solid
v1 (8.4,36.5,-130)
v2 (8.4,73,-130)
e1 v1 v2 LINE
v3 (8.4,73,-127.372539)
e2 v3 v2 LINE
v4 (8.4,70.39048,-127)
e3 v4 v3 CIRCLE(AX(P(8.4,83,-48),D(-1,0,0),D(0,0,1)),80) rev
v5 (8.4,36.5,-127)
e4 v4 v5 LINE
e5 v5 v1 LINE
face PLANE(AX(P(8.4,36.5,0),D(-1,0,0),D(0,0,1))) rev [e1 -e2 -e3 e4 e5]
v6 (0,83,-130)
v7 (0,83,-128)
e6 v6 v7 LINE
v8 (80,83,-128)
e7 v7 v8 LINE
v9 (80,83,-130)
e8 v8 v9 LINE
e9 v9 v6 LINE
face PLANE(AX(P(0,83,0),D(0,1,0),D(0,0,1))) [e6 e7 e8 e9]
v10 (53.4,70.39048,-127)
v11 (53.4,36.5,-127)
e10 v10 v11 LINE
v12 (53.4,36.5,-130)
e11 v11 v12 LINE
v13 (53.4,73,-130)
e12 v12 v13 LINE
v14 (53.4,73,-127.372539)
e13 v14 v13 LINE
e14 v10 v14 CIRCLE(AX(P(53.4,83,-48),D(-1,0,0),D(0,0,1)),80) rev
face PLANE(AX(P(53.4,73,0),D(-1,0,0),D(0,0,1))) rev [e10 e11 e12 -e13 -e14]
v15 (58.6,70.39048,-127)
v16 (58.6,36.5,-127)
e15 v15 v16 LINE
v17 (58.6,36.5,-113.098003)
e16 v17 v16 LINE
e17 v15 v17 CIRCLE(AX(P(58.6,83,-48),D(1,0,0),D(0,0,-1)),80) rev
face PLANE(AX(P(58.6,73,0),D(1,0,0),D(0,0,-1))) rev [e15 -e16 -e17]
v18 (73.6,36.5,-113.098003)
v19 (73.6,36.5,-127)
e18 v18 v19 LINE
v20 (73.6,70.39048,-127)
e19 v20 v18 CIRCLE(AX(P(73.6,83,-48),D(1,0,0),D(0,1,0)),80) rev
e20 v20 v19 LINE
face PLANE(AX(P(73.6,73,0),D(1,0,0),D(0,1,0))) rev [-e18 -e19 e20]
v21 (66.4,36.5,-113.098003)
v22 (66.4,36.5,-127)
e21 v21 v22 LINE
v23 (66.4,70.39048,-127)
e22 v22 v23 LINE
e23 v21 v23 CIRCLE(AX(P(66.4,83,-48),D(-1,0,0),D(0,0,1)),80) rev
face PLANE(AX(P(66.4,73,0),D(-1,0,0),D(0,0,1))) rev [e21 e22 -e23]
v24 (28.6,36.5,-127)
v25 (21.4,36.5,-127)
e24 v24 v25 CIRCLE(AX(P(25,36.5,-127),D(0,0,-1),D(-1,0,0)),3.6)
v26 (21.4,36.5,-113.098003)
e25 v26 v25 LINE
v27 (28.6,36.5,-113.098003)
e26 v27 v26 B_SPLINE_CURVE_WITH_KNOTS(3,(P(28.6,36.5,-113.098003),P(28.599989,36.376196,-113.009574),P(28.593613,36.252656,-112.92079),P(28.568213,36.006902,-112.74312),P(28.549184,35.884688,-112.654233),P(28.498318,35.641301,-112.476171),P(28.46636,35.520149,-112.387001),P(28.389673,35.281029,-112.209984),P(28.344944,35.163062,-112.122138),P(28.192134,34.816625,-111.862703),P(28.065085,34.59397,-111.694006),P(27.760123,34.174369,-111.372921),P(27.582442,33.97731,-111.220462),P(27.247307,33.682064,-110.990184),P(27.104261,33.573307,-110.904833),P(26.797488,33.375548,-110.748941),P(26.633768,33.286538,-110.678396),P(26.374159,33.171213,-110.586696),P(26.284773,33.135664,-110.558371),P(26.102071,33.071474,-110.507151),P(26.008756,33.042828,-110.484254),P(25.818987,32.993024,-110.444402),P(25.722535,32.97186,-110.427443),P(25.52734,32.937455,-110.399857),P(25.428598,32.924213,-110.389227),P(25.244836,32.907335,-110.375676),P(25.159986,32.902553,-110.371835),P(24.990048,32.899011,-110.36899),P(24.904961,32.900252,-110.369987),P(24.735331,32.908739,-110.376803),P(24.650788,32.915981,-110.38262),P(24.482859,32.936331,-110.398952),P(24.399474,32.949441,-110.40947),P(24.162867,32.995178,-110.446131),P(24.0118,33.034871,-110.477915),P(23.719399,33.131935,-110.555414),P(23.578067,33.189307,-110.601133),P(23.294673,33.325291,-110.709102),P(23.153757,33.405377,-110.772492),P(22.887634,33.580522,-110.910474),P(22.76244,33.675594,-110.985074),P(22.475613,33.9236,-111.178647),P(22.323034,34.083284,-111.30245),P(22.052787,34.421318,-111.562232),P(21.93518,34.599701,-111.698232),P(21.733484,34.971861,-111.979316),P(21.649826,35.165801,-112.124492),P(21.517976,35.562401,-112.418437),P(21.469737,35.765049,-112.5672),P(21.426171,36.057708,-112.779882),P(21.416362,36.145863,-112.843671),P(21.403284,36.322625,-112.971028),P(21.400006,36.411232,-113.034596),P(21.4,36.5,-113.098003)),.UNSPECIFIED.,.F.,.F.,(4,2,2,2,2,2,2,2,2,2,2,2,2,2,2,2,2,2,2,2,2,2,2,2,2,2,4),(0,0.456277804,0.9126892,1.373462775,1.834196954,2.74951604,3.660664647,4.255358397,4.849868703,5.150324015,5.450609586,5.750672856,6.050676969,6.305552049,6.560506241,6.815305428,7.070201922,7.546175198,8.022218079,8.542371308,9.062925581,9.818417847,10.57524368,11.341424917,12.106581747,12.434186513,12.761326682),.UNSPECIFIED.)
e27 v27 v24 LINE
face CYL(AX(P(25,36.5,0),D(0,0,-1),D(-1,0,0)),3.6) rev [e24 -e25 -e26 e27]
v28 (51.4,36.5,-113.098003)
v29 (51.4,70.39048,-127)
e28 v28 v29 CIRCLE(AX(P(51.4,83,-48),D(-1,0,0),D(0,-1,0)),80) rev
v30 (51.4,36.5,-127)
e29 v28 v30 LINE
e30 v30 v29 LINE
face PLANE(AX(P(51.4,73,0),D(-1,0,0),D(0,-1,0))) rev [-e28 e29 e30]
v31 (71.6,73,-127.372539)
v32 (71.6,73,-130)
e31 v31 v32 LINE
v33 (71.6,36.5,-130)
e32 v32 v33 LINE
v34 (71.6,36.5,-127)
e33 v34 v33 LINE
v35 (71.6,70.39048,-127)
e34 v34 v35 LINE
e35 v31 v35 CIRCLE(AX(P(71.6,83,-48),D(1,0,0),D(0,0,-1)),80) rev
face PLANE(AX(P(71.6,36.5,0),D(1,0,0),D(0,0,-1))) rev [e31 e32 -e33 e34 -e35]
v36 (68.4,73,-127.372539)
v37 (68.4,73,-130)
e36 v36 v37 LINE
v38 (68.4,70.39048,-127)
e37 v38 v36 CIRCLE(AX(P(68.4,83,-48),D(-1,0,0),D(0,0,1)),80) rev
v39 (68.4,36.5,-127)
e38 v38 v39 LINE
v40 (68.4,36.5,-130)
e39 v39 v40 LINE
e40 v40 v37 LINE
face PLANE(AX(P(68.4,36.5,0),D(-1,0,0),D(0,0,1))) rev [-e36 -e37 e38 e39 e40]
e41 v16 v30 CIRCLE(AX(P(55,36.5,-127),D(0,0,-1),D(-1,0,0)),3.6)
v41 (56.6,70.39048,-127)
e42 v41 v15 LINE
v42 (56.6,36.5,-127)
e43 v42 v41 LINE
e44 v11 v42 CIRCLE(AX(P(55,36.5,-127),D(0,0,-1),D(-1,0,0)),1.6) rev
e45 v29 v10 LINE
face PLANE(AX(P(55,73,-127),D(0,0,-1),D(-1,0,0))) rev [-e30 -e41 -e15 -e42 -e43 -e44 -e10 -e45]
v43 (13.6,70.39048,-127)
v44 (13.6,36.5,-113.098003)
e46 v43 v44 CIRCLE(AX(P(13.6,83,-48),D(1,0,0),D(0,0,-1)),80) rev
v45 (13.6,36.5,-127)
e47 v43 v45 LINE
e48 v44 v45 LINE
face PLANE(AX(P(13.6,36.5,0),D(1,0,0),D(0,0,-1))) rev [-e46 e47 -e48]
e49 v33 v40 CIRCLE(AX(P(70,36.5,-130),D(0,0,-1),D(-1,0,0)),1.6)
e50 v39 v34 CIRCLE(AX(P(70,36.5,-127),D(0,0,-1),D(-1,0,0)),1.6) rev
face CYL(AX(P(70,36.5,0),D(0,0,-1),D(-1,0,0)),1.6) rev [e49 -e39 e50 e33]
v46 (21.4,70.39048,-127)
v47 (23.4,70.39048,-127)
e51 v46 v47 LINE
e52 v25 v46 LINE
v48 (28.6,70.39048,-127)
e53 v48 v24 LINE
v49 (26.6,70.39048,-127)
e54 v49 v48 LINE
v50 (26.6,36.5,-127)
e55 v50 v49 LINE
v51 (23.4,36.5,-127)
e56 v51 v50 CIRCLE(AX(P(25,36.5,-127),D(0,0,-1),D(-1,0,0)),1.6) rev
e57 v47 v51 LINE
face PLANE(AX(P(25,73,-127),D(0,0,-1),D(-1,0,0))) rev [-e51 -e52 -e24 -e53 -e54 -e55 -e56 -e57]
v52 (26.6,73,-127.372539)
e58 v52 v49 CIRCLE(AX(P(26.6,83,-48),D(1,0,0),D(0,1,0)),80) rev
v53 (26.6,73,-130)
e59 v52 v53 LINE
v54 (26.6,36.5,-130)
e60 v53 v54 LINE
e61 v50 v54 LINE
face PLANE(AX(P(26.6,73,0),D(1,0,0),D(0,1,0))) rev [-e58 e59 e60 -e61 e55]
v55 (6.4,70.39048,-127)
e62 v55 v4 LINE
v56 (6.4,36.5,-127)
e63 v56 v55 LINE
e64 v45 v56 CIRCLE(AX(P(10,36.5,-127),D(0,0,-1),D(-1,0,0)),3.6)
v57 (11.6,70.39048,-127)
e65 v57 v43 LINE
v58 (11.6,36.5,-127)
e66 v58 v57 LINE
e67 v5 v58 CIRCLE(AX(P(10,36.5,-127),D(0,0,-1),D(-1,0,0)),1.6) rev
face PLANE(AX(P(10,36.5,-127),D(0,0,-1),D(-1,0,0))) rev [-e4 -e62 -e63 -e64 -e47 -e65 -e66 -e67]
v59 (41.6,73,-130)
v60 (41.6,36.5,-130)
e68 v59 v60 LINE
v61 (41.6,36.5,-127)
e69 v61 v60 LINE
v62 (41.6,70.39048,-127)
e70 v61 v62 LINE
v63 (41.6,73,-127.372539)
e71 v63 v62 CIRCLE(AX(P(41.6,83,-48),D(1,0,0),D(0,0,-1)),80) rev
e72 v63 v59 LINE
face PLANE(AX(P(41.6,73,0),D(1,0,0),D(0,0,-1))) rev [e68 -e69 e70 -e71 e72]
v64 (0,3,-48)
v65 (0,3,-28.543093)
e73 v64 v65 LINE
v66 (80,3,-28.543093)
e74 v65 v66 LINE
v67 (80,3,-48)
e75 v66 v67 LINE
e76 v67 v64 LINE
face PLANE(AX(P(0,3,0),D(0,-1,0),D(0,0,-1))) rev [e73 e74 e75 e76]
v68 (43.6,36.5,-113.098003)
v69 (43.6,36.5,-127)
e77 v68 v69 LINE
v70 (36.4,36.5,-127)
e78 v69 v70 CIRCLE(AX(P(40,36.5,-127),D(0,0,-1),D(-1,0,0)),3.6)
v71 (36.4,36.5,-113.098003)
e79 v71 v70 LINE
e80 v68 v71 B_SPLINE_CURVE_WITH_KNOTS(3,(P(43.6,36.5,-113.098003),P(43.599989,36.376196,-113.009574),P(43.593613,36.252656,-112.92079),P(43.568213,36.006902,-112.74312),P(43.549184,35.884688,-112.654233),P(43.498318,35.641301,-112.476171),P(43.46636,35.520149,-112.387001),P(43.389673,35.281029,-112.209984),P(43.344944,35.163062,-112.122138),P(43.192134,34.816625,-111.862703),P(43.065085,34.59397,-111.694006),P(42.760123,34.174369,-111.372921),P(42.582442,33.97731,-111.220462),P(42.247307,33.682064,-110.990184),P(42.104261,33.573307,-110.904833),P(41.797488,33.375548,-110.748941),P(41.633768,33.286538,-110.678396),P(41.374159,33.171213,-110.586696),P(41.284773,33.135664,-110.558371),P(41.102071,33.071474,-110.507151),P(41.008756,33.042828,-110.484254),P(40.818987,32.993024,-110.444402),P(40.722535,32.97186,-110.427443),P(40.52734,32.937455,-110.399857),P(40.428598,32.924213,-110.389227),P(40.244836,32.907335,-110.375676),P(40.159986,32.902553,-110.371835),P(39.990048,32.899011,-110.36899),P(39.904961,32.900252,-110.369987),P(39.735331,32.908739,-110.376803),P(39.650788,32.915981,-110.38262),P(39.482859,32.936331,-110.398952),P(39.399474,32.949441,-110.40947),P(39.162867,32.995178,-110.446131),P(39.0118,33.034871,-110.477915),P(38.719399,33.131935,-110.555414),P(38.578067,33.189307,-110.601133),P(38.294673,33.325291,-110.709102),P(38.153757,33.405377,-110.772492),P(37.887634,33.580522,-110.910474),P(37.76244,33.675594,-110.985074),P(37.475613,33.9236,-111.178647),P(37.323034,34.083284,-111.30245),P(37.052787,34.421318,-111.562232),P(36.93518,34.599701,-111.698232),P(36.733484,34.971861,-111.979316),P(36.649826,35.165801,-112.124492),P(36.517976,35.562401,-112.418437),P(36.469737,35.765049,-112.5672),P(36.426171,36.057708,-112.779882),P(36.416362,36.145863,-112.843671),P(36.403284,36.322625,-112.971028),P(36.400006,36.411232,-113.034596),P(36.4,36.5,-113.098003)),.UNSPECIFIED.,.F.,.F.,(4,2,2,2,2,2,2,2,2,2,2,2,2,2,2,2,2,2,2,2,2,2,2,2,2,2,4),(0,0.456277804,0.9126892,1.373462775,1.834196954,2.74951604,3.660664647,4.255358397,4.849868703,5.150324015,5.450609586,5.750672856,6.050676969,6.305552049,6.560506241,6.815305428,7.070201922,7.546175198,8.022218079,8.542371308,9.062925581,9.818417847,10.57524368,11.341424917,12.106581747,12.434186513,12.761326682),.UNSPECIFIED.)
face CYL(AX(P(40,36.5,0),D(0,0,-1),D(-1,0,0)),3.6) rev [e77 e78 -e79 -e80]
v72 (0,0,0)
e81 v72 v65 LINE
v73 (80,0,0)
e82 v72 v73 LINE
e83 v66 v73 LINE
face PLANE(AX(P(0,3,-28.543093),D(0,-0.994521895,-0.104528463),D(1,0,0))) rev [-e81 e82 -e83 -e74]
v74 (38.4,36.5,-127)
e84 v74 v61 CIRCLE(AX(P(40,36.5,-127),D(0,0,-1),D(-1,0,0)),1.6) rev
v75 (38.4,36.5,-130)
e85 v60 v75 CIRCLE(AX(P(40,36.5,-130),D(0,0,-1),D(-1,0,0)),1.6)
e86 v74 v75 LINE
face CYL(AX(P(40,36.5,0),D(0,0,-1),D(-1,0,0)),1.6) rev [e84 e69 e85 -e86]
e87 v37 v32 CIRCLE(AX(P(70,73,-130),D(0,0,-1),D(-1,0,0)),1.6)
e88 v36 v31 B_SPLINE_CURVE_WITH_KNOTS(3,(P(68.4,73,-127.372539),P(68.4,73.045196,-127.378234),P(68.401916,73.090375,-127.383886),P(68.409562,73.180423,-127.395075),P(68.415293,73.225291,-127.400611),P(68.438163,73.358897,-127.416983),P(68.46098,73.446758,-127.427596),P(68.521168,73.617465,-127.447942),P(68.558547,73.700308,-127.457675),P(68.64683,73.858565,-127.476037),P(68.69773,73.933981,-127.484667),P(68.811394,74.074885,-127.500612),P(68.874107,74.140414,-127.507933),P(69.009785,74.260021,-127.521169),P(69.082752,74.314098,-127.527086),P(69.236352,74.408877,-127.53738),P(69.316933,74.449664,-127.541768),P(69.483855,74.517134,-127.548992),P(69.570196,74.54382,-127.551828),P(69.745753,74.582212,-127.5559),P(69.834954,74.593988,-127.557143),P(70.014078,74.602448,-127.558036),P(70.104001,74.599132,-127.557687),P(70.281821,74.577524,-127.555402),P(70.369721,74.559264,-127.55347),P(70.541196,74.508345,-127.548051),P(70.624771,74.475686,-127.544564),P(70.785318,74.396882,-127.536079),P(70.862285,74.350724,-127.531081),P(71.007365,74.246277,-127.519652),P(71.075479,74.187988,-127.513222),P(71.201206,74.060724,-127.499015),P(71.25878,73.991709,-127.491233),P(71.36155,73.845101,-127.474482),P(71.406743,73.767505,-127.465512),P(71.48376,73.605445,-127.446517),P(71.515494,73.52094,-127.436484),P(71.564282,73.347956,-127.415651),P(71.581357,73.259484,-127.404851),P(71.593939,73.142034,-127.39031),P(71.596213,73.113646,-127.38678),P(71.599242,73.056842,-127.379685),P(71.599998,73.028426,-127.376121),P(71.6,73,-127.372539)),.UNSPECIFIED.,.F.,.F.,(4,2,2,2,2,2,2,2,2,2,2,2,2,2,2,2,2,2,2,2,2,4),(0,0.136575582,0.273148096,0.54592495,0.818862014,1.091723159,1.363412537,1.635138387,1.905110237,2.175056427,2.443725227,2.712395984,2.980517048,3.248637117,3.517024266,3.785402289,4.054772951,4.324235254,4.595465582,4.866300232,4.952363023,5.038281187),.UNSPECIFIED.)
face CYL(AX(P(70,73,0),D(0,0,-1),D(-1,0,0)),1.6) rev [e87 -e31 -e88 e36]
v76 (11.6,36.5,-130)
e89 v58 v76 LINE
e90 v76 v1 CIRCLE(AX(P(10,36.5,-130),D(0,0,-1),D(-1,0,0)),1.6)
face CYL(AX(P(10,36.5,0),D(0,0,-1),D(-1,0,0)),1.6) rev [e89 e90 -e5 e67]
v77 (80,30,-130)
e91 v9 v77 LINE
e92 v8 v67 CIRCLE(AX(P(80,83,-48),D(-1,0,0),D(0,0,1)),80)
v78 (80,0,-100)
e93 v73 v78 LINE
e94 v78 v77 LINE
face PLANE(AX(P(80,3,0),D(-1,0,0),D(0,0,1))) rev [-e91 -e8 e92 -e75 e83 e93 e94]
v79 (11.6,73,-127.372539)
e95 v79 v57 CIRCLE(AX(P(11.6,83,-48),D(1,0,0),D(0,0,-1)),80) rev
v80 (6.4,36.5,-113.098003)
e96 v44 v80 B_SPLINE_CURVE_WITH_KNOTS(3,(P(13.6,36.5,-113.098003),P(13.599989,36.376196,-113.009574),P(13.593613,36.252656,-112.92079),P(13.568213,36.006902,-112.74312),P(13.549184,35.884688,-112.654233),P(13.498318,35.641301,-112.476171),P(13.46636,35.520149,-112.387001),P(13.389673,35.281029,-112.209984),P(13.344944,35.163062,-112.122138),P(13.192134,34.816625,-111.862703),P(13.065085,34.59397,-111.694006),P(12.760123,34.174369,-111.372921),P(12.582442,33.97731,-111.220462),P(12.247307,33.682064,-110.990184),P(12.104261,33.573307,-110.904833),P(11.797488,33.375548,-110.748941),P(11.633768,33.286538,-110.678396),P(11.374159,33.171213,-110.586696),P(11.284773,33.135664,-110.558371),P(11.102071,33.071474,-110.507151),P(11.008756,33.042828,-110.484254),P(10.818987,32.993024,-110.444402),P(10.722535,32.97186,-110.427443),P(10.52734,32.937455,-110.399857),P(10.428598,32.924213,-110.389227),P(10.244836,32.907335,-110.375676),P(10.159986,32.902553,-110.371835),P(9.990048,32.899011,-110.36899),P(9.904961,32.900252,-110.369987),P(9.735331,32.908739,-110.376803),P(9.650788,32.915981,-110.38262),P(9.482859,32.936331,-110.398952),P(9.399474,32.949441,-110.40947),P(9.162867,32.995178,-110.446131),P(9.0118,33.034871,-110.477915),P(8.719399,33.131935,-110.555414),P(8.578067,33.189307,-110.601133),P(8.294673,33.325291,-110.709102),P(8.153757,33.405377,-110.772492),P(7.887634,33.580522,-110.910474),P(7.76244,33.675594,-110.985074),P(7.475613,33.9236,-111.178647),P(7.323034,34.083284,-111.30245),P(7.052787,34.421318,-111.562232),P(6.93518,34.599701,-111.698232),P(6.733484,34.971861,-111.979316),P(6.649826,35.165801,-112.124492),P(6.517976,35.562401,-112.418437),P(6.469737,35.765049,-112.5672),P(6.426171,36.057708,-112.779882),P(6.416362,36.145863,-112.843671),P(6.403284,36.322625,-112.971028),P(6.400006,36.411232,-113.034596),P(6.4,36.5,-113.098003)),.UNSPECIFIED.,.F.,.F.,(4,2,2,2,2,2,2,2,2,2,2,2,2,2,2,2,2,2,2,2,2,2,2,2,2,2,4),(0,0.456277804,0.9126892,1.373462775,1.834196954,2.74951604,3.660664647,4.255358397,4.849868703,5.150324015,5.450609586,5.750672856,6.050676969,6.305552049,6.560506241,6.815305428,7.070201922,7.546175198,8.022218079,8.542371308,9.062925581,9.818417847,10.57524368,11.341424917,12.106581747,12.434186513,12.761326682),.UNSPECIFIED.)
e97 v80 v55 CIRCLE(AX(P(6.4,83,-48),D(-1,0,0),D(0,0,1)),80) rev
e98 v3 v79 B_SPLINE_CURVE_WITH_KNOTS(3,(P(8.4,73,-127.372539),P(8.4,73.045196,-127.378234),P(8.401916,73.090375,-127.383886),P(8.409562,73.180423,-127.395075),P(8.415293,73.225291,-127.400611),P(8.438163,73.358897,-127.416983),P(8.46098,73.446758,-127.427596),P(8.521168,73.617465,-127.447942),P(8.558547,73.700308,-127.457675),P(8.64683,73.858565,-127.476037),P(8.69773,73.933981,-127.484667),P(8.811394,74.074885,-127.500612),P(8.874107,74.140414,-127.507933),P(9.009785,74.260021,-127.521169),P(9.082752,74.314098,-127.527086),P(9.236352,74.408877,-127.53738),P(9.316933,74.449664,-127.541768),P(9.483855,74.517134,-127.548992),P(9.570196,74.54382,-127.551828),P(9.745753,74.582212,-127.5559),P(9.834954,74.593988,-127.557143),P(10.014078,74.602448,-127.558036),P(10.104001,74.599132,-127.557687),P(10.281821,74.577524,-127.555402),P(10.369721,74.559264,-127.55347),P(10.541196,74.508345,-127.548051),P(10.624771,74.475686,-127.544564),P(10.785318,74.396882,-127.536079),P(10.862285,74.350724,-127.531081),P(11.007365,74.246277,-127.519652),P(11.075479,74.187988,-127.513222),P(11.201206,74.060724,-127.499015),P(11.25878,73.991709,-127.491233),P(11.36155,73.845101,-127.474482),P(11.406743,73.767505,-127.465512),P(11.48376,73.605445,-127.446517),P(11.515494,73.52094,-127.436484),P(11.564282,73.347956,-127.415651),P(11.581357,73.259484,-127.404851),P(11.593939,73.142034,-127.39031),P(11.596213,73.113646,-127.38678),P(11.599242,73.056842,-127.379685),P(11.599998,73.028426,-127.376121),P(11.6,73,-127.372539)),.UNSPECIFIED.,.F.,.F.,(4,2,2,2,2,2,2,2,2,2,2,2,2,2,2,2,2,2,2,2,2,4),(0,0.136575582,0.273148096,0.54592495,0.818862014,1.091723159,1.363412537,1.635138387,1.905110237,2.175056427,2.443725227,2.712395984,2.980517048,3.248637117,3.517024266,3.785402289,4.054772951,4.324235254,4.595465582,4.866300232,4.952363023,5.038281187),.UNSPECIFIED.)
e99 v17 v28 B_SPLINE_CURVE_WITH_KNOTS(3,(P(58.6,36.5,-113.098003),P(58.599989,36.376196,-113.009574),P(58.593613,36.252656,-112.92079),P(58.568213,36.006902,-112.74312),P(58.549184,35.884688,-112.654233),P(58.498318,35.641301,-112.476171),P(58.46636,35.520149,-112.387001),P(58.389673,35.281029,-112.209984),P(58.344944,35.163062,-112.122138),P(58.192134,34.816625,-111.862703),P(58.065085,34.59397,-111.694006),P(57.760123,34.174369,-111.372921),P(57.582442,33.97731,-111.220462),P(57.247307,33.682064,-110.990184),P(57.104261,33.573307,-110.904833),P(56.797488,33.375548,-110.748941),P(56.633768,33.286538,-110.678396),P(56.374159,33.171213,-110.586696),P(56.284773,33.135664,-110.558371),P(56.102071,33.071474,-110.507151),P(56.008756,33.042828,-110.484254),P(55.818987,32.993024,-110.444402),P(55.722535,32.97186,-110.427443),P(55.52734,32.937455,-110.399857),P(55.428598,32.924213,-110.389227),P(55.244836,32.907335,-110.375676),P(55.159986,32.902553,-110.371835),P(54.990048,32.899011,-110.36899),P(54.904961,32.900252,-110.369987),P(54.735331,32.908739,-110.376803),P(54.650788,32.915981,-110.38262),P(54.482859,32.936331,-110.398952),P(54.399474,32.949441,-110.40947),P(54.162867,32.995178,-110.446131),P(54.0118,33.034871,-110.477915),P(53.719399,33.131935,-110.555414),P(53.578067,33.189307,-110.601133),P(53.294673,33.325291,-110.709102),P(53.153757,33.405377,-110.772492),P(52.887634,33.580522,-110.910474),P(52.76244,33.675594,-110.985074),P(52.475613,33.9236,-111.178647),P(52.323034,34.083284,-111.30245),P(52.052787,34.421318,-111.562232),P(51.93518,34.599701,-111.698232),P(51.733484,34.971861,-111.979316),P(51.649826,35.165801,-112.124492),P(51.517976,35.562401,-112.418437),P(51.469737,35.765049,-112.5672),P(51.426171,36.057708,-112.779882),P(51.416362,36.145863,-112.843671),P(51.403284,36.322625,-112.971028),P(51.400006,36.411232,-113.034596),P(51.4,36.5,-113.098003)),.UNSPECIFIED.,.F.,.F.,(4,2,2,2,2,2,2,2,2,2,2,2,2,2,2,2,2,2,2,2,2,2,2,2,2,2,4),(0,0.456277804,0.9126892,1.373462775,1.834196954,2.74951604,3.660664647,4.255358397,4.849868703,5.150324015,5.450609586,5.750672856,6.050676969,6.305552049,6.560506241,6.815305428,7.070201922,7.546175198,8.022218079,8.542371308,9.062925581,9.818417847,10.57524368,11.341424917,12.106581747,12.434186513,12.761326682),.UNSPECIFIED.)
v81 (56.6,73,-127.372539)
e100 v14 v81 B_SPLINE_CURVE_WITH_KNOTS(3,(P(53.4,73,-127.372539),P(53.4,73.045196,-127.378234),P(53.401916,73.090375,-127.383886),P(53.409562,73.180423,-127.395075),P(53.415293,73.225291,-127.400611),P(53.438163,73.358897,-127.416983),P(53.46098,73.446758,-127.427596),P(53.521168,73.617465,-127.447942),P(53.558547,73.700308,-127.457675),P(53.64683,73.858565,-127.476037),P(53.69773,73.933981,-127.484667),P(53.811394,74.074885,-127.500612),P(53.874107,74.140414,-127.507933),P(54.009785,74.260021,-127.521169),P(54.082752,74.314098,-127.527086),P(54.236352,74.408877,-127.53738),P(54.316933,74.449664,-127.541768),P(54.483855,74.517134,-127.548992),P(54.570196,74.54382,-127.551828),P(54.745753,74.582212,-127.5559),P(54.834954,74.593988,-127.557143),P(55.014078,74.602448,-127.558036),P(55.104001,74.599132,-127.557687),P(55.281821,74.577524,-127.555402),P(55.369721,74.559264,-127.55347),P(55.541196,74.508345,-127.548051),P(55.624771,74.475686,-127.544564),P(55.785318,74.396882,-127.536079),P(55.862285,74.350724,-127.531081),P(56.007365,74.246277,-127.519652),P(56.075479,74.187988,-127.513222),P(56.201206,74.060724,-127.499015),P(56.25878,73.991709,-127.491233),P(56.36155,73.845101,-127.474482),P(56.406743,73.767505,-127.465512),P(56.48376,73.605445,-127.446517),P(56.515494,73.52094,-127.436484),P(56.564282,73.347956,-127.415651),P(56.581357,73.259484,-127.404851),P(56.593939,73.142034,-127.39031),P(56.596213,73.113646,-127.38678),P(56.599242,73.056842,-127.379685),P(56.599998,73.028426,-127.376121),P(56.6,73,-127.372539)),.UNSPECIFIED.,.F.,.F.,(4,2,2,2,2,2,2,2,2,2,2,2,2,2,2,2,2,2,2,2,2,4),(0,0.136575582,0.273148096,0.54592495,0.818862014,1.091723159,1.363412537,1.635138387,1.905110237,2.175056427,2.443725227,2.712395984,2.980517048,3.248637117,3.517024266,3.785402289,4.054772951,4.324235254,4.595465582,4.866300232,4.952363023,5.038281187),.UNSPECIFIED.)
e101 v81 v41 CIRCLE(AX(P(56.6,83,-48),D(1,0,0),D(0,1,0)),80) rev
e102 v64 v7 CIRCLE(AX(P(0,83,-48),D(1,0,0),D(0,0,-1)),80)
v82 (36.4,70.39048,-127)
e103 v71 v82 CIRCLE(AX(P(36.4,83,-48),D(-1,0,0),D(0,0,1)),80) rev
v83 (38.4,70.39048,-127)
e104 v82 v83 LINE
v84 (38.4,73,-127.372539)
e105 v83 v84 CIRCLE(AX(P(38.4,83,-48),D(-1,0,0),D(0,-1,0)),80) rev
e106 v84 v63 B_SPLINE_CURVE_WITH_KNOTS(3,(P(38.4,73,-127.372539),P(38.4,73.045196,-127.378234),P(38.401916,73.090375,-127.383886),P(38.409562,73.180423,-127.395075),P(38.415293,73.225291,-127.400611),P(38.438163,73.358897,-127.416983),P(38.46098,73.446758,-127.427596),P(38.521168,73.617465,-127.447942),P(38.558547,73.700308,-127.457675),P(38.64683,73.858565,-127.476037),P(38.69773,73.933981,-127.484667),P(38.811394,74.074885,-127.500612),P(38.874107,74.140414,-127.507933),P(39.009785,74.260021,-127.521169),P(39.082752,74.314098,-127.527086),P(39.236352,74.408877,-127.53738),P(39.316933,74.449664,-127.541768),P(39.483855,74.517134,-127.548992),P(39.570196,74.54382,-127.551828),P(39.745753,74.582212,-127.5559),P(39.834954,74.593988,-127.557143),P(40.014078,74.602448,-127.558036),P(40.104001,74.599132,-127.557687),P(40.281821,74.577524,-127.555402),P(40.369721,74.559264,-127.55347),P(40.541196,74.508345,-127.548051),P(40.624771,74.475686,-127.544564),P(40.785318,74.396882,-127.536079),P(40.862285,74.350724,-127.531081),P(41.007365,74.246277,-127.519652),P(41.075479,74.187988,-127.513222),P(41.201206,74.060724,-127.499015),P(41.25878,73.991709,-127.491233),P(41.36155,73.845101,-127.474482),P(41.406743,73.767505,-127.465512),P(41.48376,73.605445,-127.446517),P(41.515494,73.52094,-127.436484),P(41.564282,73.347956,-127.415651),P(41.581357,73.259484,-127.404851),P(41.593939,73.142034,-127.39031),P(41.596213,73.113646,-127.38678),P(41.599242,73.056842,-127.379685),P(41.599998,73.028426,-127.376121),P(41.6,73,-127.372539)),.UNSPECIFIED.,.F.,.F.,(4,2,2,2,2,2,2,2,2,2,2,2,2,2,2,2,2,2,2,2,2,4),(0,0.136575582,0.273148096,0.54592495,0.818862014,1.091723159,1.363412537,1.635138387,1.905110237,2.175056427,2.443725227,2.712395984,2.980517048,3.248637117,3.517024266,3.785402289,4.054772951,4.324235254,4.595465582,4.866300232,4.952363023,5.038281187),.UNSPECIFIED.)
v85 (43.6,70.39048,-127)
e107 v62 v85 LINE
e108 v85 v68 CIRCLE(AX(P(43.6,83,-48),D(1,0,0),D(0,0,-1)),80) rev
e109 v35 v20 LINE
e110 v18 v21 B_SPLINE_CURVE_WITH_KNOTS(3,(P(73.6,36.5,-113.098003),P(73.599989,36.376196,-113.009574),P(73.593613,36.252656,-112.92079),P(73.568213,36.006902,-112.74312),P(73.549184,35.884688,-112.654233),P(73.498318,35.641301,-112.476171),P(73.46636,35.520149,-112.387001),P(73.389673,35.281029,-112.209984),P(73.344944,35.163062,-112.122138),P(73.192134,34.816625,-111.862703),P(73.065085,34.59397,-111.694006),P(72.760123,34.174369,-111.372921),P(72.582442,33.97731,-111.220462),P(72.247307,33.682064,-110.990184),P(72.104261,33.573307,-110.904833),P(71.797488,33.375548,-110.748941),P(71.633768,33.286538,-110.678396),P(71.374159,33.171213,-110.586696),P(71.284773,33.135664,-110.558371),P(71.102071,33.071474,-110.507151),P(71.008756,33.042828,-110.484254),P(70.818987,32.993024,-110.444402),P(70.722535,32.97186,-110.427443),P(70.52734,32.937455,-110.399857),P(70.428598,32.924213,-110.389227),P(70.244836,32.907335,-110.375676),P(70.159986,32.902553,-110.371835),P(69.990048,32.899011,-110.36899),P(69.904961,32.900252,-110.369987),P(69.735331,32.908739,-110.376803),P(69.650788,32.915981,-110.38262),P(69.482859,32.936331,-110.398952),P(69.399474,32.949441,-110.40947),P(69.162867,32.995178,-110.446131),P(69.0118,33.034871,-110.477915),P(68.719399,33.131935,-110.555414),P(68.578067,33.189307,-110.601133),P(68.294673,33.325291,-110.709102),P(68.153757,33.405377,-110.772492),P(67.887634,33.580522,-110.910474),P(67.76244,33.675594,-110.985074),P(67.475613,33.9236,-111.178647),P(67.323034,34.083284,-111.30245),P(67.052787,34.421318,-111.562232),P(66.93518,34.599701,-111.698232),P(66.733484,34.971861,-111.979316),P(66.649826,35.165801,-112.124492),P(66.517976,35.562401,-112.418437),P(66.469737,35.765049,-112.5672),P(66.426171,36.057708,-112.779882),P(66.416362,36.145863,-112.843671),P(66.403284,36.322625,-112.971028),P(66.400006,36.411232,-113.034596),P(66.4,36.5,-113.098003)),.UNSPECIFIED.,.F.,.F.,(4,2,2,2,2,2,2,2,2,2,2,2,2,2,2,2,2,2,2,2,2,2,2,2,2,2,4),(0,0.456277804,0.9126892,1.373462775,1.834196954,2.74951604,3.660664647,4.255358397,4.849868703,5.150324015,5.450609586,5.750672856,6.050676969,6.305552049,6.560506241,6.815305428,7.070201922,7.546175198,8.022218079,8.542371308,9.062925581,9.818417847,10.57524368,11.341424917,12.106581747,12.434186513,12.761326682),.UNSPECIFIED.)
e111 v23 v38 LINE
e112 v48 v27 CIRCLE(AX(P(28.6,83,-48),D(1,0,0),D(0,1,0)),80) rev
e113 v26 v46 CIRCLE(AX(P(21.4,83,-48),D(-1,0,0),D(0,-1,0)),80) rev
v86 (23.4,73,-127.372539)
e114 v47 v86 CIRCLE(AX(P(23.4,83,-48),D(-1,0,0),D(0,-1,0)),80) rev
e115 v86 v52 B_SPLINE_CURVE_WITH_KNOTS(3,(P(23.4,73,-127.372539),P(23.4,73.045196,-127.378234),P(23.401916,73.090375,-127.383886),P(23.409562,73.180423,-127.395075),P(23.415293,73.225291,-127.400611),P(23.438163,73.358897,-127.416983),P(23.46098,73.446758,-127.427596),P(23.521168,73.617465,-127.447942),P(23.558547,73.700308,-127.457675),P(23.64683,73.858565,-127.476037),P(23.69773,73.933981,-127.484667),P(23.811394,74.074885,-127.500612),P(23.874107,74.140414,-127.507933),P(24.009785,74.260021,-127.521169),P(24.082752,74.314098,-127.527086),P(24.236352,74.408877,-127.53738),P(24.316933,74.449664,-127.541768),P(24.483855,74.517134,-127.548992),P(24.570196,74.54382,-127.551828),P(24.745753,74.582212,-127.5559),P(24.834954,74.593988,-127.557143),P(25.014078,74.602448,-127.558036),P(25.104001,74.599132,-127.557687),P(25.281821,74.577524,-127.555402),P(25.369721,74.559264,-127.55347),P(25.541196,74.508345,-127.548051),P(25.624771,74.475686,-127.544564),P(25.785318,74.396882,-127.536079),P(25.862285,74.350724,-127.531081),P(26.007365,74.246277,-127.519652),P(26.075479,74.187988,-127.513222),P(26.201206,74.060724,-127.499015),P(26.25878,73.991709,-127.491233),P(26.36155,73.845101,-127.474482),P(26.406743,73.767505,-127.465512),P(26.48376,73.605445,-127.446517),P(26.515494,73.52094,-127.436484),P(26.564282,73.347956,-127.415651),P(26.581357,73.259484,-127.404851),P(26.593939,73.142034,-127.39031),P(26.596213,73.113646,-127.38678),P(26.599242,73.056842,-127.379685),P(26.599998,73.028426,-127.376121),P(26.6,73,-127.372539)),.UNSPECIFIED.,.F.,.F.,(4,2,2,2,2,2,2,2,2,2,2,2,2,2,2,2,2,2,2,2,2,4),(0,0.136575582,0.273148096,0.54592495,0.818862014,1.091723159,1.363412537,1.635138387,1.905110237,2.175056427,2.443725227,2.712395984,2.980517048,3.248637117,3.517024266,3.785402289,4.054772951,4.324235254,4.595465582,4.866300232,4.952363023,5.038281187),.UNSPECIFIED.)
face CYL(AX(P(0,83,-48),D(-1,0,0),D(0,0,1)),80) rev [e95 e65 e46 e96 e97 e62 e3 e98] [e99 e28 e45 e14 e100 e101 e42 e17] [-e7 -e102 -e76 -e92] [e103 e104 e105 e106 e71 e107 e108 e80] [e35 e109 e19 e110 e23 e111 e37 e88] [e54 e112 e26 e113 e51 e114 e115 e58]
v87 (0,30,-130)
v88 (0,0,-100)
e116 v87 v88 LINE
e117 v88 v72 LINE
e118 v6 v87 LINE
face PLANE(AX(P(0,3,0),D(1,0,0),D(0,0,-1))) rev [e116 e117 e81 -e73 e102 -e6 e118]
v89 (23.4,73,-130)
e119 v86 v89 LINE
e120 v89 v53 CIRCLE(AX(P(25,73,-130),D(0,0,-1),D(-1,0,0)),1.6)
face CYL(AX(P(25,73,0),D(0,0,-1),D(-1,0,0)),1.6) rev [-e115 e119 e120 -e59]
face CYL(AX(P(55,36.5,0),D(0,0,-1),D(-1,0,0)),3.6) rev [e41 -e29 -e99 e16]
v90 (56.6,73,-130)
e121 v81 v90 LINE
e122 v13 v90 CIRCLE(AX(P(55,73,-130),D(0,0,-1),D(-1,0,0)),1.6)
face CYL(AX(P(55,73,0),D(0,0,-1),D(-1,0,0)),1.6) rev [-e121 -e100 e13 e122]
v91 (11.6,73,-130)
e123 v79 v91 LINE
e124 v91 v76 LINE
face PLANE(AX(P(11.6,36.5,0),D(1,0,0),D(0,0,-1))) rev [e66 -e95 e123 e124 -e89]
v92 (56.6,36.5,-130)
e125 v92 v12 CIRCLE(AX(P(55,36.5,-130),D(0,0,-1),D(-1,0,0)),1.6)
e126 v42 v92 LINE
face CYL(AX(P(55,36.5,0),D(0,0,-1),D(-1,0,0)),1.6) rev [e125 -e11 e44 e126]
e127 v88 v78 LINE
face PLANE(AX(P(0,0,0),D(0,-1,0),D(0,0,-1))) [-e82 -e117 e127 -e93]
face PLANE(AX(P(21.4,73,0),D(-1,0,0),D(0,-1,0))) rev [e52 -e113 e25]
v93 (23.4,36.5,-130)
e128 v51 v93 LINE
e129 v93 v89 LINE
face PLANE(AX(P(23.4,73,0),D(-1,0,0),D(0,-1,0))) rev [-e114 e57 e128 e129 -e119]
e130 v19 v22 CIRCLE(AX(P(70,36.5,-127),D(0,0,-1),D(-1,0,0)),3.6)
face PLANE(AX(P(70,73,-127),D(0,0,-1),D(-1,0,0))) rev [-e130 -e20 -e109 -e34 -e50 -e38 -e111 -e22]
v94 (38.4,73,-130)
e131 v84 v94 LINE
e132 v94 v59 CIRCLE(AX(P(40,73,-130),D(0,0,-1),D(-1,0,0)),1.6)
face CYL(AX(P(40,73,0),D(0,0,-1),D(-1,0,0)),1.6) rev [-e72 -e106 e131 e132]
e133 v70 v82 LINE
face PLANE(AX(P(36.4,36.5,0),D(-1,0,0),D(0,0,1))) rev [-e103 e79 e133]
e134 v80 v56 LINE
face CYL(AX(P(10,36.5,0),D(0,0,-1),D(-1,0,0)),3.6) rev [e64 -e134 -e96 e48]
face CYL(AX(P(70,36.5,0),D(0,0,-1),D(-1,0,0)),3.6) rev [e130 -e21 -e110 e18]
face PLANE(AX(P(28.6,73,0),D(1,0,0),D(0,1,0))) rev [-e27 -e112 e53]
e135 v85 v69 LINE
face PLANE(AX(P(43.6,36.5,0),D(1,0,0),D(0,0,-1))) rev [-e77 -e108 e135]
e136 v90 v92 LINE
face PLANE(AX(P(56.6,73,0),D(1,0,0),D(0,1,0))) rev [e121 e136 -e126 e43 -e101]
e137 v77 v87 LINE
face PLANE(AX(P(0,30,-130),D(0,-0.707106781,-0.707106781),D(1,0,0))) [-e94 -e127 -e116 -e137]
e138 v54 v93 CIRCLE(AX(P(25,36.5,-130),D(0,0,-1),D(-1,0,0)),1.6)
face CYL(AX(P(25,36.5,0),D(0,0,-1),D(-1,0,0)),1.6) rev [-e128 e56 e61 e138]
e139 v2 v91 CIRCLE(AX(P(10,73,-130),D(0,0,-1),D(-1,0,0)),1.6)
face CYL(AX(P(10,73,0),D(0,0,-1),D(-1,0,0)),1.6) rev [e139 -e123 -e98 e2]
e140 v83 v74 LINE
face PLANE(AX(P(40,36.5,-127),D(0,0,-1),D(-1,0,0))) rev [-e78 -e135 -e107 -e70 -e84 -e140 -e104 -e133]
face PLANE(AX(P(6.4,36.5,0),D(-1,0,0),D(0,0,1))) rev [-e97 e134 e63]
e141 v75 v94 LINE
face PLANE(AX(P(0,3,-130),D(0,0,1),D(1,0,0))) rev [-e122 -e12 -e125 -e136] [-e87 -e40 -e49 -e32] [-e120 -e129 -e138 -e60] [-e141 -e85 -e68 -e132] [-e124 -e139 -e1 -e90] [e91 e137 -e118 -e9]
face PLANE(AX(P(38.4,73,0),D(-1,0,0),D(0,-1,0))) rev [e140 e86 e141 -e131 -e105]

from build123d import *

# Parameters (mm, degrees)
SKETCH1_W           = 80
SKETCH1_H           = 130
BOSS_EXTRUDE1_DEPTH = 3
SKETCH2_W           = 80
SKETCH2_H           = 2
BOSS_EXTRUDE2_DEPTH = 80
FILLET1_DEPTH       = 80
CUT_EXTRUDE1_DEPTH  = 174.749820144
CUT_EXTRUDE2_START  = -3
CUT_EXTRUDE2_DEPTH  = 171.749820238
CHAMFER1_SIZE2      = 28.543093363
CHAMFER1_SIZE       = 3
CHAMFER2_SIZE       = 30


with BuildPart() as part:
    # Sketch1 → Boss-Extrude1 (new body)
    with BuildSketch(Plane(origin=(0, 0, 0), x_dir=(1, 0, 0), z_dir=(0, 1, 0))):
        with Locations((40, 65)):
            Rectangle(SKETCH1_W, SKETCH1_H)
    extrude(amount=BOSS_EXTRUDE1_DEPTH)

    # Sketch2 → Boss-Extrude2 (add)
    with BuildSketch(Plane(origin=(0, 3, 0), x_dir=(1, 0, 0), z_dir=(0, 1, 0))):
        with Locations((40, 129)):
            Rectangle(SKETCH2_W, SKETCH2_H)
    extrude(amount=BOSS_EXTRUDE2_DEPTH)

    # Fillet1: read off the stored shape, not the designer's step
    # Fillet1 outline → Fillet1 (add)
    with BuildSketch(Plane.YZ):
        with BuildLine():
            Line((3, -128), (83, -128))
            ThreePointArc((83, -128), (26.431457505, -104.568542495), (3, -48))
            Line((3, -48), (3, -128))
        make_face()
    extrude(amount=FILLET1_DEPTH)

    # Sketch3 → Cut-Extrude1 (cut, through all)
    with BuildSketch(Plane(origin=(0, 0, -130), x_dir=(-1, 0, 0), z_dir=(0, 0, -1))):
        with BuildLine():
            Line((-38.4, 73), (-38.4, 36.5))
            ThreePointArc((-38.4, 36.5), (-40, 34.9), (-41.6, 36.5))
            Line((-41.6, 36.5), (-41.6, 73))
            ThreePointArc((-41.6, 73), (-40, 74.6), (-38.4, 73))
        make_face()
        with BuildLine():
            Line((-53.4, 73), (-53.4, 36.5))
            ThreePointArc((-53.4, 36.5), (-55, 34.9), (-56.6, 36.5))
            Line((-56.6, 36.5), (-56.6, 73))
            ThreePointArc((-56.6, 73), (-55, 74.6), (-53.4, 73))
        make_face()
        with BuildLine():
            Line((-71.6, 36.5), (-71.6, 73))
            ThreePointArc((-71.6, 73), (-70, 74.6), (-68.4, 73))
            Line((-68.4, 73), (-68.4, 36.5))
            ThreePointArc((-68.4, 36.5), (-70, 34.9), (-71.6, 36.5))
        make_face()
        with BuildLine():
            Line((-23.4, 73), (-23.4, 36.5))
            ThreePointArc((-23.4, 36.5), (-25, 34.9), (-26.6, 36.5))
            Line((-26.6, 36.5), (-26.6, 73))
            ThreePointArc((-26.6, 73), (-25, 74.6), (-23.4, 73))
        make_face()
        with BuildLine():
            Line((-11.6, 36.5), (-11.6, 73))
            ThreePointArc((-11.6, 73), (-10, 74.6), (-8.4, 73))
            Line((-8.4, 73), (-8.4, 36.5))
            ThreePointArc((-8.4, 36.5), (-10, 34.9), (-11.6, 36.5))
        make_face()
    extrude(amount=-CUT_EXTRUDE1_DEPTH, mode=Mode.SUBTRACT)

    # Sketch4 → Cut-Extrude2 (cut, through all)
    with BuildSketch(Plane(origin=(0, 0, -130), x_dir=(-1, 0, 0), z_dir=(0, 0, -1)).offset(CUT_EXTRUDE2_START)):
        with BuildLine():
            Line((-66.4, 73), (-66.4, 36.5))
            ThreePointArc((-66.4, 36.5), (-70, 32.9), (-73.6, 36.5))
            Line((-73.6, 36.5), (-73.6, 73))
            ThreePointArc((-73.6, 73), (-70, 76.6), (-66.4, 73))
        make_face()
        with BuildLine():
            Line((-51.4, 73), (-51.4, 36.5))
            ThreePointArc((-51.4, 36.5), (-55, 32.9), (-58.6, 36.5))
            Line((-58.6, 36.5), (-58.6, 73))
            ThreePointArc((-58.6, 73), (-55, 76.6), (-51.4, 73))
        make_face()
        with BuildLine():
            Line((-43.6, 36.5), (-43.6, 73))
            ThreePointArc((-43.6, 73), (-40, 76.6), (-36.4, 73))
            Line((-36.4, 73), (-36.4, 36.5))
            ThreePointArc((-36.4, 36.5), (-40, 32.9), (-43.6, 36.5))
        make_face()
        with BuildLine():
            Line((-21.4, 73), (-21.4, 36.5))
            ThreePointArc((-21.4, 36.5), (-25, 32.9), (-28.6, 36.5))
            Line((-28.6, 36.5), (-28.6, 73))
            ThreePointArc((-28.6, 73), (-25, 76.6), (-21.4, 73))
        make_face()
        with BuildLine():
            Line((-13.6, 36.5), (-13.6, 73))
            ThreePointArc((-13.6, 73), (-10, 76.6), (-6.4, 73))
            Line((-6.4, 73), (-6.4, 36.5))
            ThreePointArc((-6.4, 36.5), (-10, 32.9), (-13.6, 36.5))
        make_face()
    extrude(amount=-CUT_EXTRUDE2_DEPTH, mode=Mode.SUBTRACT)

    # Chamfer1
    chamfer1_edges = [part.edges().sort_by_distance(p)[0] for p in [
        (40, 3, 0),
    ]]
    chamfer1_side = [part.faces().sort_by_distance(p)[0] for p in [
        (40, 2.94, 0),
    ]]
    chamfer(chamfer1_edges, length=CHAMFER1_SIZE - 0.0001, length2=CHAMFER1_SIZE2 - 0.0001, reference=chamfer1_side[0])  # a hair under: the kernel refuses the full size

    # Chamfer2
    chamfer2_edges = [part.edges().sort_by_distance(p)[0] for p in [
        (40, 0, -130),
    ]]
    chamfer(chamfer2_edges, length=CHAMFER2_SIZE)


solid = part.part
